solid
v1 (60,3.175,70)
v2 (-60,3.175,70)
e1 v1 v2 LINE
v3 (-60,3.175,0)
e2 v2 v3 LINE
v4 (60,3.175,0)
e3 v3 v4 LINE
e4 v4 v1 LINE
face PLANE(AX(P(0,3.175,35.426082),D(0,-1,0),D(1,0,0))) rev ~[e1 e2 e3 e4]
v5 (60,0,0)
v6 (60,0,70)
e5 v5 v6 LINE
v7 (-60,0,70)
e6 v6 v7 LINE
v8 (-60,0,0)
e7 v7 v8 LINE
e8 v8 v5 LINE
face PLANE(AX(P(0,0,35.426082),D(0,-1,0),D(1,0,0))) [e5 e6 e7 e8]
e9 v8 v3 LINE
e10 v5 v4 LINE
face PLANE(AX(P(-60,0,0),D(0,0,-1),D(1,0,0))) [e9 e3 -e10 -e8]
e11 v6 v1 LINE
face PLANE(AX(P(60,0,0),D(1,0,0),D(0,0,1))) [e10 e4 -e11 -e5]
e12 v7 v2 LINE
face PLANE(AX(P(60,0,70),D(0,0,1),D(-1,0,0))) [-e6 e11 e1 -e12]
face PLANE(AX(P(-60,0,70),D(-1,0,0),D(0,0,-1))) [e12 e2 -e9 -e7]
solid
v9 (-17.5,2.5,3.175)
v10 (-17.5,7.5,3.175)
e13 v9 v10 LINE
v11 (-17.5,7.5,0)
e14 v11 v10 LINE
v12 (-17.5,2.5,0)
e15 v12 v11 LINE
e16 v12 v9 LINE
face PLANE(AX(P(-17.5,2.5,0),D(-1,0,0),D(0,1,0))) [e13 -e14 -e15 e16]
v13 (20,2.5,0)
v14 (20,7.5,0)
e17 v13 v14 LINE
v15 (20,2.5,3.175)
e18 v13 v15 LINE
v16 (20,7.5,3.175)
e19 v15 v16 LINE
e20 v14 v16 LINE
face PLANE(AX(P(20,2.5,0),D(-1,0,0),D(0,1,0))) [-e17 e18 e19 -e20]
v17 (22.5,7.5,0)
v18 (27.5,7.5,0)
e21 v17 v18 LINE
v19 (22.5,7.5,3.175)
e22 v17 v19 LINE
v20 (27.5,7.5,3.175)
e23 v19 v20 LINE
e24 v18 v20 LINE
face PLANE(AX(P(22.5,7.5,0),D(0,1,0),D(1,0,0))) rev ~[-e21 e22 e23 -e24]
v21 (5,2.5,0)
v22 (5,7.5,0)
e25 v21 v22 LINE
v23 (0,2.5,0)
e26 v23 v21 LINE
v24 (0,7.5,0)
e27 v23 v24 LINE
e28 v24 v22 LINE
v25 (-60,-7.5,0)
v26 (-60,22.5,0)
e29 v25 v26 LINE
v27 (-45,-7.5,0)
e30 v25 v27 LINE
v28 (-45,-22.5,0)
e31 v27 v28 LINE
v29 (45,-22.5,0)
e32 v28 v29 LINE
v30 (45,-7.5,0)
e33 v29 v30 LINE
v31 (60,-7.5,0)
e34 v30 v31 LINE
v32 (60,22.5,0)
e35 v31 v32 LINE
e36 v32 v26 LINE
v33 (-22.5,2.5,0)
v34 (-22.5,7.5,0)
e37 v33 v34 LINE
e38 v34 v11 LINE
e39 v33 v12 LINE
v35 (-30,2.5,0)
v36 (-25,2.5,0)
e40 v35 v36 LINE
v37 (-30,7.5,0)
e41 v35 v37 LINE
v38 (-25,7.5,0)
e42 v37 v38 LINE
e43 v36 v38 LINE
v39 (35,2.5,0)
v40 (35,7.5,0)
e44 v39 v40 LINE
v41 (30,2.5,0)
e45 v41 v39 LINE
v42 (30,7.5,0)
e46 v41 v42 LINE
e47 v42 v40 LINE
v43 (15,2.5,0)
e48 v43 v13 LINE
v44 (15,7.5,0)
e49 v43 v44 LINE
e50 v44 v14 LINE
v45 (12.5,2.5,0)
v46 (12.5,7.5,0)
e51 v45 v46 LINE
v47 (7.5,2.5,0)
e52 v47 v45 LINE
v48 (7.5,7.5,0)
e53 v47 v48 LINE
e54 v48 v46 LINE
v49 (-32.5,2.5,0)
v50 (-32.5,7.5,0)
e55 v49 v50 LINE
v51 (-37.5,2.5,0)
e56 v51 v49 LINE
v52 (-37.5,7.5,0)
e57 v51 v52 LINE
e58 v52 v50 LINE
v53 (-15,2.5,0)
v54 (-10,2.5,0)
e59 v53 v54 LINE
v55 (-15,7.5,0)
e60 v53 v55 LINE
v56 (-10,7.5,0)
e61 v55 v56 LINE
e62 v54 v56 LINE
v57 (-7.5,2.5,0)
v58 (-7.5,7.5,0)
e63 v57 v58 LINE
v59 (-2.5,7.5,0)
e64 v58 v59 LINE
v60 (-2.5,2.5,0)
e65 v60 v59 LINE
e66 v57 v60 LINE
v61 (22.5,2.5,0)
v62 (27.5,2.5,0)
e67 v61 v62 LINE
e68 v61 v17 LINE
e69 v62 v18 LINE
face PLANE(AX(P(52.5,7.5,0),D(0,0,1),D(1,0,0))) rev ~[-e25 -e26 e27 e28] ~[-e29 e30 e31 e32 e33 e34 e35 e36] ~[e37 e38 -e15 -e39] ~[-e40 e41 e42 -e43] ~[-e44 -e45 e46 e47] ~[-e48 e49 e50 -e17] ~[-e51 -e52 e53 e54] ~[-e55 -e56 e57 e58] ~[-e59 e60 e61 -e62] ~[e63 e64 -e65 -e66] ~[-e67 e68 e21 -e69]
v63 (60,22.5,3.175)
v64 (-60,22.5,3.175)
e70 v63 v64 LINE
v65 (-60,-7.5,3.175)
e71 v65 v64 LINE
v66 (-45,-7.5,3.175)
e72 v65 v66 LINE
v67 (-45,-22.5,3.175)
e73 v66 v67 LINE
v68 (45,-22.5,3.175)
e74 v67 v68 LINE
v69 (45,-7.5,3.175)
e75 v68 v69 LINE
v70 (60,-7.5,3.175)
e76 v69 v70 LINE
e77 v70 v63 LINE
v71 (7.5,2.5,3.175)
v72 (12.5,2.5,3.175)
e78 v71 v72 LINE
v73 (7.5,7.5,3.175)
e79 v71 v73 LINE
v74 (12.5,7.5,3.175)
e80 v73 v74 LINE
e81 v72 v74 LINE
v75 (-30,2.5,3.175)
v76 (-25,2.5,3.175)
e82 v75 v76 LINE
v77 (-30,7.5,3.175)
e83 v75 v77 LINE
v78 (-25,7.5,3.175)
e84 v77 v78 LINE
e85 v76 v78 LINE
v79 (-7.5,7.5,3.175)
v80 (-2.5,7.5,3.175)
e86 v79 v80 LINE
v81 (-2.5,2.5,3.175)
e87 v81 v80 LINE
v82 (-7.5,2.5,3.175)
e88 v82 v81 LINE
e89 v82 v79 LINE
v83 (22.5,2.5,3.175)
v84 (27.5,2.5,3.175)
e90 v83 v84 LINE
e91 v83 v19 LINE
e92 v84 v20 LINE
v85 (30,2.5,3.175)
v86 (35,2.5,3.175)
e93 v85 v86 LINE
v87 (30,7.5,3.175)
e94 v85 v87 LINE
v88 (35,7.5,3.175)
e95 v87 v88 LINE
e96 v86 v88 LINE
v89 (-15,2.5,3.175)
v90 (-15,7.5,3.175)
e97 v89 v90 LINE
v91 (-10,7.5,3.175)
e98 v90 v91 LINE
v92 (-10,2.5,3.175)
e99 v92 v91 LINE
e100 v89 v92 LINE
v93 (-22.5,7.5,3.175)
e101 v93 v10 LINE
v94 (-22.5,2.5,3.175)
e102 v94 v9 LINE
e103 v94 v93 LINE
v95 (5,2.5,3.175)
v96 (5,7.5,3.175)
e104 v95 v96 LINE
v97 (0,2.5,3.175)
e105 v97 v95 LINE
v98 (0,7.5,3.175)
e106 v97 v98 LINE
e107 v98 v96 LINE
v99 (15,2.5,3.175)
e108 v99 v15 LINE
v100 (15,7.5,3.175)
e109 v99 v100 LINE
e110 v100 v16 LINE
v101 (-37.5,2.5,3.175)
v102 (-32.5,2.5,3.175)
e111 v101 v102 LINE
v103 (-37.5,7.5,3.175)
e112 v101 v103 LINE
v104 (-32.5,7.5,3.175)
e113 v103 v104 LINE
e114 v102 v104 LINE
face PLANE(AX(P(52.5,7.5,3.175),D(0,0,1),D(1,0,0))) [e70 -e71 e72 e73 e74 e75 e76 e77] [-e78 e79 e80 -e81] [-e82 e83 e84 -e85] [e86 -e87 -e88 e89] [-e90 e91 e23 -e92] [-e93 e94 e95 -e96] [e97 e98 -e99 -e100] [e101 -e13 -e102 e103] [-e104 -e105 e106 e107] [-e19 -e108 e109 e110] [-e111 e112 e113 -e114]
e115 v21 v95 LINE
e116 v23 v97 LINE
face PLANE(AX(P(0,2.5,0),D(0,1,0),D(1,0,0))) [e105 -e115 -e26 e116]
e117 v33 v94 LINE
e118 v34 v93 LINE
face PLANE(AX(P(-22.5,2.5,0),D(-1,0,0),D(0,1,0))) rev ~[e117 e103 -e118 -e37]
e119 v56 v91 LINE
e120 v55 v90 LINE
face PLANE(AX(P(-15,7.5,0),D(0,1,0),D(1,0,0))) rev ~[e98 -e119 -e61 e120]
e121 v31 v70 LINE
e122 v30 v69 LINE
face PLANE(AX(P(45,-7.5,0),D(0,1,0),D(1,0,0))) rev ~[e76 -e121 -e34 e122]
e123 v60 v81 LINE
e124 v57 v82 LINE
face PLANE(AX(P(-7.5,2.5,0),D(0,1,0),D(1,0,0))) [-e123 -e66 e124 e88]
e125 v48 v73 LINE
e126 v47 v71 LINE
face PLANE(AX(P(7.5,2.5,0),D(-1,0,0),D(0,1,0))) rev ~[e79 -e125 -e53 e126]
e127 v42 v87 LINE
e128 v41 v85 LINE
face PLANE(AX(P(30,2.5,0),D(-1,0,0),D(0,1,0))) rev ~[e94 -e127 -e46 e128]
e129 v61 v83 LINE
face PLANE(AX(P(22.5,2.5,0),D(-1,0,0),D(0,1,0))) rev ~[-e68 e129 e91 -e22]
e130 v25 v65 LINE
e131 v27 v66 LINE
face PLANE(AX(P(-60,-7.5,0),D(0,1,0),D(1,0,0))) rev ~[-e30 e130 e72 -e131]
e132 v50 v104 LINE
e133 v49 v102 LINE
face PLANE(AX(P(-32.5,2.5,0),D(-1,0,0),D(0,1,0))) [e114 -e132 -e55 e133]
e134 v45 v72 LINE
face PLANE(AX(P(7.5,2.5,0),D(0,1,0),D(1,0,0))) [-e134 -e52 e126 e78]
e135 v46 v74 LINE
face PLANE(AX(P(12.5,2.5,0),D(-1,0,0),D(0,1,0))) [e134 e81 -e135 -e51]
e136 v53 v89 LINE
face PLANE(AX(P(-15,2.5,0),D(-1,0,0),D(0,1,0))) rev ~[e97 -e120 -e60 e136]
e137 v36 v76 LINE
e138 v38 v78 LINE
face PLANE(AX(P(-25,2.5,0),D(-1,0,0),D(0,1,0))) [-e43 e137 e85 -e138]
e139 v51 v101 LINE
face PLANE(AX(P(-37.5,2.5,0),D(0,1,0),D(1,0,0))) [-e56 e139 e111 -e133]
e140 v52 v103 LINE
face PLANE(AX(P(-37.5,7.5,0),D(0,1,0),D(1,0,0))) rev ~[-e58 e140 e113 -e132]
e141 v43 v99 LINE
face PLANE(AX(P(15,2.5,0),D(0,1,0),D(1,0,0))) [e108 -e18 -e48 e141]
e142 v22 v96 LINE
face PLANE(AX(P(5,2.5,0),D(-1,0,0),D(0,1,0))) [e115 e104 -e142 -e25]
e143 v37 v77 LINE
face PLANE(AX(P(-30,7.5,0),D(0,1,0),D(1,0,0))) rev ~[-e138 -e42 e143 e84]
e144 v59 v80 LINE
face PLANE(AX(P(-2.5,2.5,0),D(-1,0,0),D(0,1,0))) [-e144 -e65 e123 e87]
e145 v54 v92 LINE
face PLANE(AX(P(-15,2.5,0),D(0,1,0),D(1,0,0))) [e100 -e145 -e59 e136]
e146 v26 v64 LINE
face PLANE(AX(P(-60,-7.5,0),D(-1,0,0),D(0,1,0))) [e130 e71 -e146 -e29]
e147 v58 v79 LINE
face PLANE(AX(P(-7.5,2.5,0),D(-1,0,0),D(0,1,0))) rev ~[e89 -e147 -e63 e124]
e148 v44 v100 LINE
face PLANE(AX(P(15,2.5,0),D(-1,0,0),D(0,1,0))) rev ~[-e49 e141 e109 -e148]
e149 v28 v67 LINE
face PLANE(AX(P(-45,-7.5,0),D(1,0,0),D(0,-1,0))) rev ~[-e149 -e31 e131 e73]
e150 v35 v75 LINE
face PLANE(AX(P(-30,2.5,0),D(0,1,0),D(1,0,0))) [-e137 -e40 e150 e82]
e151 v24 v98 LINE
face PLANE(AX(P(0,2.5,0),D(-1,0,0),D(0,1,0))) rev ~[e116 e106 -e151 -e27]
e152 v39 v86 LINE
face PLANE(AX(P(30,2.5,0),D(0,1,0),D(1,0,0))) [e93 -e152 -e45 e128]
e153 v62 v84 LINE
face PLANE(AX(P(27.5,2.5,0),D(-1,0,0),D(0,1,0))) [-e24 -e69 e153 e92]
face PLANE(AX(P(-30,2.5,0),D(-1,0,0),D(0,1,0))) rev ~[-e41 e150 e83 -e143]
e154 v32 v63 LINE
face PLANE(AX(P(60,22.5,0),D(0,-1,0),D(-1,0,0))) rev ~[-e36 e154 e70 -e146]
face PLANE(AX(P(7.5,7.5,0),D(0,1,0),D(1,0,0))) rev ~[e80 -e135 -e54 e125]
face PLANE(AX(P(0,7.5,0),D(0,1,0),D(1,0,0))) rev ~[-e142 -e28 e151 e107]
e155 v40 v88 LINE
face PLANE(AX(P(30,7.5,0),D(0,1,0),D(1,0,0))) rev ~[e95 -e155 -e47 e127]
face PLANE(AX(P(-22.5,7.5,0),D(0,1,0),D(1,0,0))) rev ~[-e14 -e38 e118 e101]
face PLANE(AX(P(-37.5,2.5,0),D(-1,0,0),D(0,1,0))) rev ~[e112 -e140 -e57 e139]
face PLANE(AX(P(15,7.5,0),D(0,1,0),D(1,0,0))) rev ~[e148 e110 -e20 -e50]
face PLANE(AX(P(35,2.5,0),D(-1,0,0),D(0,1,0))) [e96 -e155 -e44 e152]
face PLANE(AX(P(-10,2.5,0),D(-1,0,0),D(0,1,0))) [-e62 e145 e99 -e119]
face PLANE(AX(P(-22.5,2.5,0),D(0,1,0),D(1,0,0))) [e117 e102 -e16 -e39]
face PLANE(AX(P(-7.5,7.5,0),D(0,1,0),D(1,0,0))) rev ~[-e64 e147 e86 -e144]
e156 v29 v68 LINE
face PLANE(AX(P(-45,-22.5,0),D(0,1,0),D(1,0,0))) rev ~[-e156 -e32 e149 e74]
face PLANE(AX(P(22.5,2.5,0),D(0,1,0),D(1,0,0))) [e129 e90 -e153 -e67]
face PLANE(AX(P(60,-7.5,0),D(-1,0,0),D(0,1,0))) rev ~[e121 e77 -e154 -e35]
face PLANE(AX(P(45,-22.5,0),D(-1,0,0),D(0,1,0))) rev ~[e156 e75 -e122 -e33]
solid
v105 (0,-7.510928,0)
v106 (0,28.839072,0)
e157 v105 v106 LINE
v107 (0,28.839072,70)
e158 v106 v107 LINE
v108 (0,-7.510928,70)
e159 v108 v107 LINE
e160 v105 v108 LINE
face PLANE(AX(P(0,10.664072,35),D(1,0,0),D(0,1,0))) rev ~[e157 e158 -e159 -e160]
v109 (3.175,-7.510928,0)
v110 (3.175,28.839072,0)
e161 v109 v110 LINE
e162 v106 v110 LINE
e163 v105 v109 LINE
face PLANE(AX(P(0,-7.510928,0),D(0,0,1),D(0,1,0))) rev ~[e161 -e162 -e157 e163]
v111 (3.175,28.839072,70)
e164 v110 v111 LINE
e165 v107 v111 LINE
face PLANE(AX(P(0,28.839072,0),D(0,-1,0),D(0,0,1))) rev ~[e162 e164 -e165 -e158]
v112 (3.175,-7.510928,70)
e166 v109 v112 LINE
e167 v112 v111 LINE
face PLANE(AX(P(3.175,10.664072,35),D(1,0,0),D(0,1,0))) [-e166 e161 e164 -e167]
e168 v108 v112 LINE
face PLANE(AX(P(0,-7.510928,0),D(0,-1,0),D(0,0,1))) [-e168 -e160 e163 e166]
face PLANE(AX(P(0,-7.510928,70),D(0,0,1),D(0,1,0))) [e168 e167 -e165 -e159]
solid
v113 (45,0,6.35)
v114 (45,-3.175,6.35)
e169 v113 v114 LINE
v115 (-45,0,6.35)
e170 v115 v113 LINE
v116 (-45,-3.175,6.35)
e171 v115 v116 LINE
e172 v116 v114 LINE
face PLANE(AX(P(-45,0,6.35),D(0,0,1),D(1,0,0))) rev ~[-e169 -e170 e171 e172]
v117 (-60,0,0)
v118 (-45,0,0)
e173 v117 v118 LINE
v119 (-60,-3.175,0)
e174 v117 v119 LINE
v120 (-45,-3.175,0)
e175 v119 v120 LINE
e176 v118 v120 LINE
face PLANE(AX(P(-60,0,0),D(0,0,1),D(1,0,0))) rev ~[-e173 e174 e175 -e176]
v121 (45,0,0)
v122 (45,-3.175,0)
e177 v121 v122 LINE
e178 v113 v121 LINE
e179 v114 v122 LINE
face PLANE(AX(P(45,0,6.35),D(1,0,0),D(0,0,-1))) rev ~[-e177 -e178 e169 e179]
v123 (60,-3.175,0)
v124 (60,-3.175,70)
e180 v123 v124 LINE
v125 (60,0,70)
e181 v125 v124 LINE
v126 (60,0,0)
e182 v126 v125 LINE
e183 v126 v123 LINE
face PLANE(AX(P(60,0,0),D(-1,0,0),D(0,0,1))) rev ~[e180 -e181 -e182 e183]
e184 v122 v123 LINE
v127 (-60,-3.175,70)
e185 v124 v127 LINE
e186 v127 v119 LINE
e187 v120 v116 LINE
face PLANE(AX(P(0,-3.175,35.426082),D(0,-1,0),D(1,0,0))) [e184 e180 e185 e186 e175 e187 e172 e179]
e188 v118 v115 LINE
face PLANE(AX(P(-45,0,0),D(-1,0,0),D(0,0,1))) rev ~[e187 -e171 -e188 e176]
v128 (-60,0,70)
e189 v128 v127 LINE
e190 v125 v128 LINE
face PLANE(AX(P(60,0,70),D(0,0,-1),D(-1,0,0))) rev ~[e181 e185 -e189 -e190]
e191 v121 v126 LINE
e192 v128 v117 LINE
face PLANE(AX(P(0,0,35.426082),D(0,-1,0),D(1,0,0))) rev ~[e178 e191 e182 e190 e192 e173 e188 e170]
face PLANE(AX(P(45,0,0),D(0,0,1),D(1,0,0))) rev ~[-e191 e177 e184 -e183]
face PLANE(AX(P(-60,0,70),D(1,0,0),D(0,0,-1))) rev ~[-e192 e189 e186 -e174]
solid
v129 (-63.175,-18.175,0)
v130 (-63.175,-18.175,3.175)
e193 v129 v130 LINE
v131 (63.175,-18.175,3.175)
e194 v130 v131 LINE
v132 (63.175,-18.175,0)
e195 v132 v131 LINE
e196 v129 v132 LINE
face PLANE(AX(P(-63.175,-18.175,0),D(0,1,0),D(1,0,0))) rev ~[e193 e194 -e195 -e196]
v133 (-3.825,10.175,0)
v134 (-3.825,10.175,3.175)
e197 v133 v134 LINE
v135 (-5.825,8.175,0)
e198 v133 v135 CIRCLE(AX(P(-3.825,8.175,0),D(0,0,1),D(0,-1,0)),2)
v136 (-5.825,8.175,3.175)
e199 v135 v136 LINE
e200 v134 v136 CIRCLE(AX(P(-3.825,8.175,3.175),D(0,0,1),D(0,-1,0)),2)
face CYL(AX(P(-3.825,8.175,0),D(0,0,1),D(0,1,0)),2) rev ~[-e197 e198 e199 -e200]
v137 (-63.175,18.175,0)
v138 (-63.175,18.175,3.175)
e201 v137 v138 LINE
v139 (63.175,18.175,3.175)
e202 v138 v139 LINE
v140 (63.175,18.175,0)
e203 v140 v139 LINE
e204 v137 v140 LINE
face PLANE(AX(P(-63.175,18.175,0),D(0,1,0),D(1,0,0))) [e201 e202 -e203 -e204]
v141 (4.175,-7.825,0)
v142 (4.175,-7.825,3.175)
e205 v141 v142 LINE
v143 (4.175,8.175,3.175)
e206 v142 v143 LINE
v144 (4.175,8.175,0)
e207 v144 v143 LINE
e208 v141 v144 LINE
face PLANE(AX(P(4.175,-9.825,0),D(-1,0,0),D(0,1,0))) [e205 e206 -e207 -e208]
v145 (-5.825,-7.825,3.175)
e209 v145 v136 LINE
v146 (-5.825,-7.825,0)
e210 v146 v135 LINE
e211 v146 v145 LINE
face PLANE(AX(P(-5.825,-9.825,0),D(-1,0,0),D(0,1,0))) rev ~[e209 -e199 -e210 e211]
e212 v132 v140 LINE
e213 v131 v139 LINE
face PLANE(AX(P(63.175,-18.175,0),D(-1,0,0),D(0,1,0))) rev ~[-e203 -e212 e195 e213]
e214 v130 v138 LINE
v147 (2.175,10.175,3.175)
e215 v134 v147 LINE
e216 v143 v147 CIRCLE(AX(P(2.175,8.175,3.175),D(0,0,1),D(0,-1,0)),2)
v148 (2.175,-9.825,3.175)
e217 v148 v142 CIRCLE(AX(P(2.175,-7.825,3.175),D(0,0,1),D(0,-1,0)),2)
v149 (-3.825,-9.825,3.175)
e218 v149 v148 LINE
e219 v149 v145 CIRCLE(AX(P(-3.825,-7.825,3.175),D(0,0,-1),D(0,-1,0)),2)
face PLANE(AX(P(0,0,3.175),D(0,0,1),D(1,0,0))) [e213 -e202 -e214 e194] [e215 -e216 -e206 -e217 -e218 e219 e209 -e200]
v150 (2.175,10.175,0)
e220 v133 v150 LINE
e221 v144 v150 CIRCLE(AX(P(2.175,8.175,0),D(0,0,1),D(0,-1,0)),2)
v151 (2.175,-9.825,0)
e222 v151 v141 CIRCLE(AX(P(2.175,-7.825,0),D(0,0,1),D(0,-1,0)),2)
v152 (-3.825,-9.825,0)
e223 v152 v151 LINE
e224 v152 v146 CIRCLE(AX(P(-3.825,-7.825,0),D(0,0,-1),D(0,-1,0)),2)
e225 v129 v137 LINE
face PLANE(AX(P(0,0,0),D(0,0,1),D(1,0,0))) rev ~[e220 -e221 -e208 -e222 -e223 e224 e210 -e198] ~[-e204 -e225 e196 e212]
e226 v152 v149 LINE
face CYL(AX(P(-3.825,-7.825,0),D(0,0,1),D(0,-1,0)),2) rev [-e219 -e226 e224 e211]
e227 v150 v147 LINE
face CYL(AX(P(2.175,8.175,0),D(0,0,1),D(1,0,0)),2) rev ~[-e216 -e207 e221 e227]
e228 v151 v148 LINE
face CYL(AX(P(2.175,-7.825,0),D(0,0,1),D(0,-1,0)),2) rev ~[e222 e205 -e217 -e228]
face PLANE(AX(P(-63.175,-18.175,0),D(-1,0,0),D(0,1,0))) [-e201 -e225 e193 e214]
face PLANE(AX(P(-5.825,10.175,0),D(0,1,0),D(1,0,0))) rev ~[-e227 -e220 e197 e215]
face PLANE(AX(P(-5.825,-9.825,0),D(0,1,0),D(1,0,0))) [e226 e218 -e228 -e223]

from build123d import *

# Parameters (mm, degrees)
F0_W     = 15
F0_H     = 30
F0_W_2   = 5
F0_H_2   = 5
F1_DEPTH = 3.175
F3_DEPTH = 3.175
F2_W     = 90
F2_H     = 6.35
F4_DEPTH = 3.175
F5_W     = 36.35
F5_H     = 70
F6_DEPTH = 3.175
F7_W     = 126.35
F7_H     = 36.35
F7_W_2   = 10
F7_H_2   = 20
F8_DEPTH = 3.175
F9_R     = 2


# Not quite as in the source:
# - a feature names something its author has since deleted; it is built from what else it names


with BuildPart() as f1:
    # F0 (on Top) → F1 (new body)
    with BuildSketch(Plane.XY):
        with Locations((52.5, 7.5)):
            Rectangle(F0_W, F0_H)
        with Locations((-52.5, 7.5)):
            Rectangle(F0_W, F0_H)
        Polygon((-45, -22.5), (45, -22.5), (45, -7.5), (45, 22.5), (-45, 22.5), (-45, -7.5), (-45, -10.675), align=None)
        with Locations((-35, 5)):
            Rectangle(F0_W_2, F0_H_2, mode=Mode.SUBTRACT)
        with Locations((-27.5, 5)):
            Rectangle(F0_W_2, F0_H_2, mode=Mode.SUBTRACT)
        with Locations((-20, 5)):
            Rectangle(F0_W_2, F0_H_2, mode=Mode.SUBTRACT)
        with Locations((-12.5, 5)):
            Rectangle(F0_W_2, F0_H_2, mode=Mode.SUBTRACT)
        with Locations((-5, 5)):
            Rectangle(F0_W_2, F0_H_2, mode=Mode.SUBTRACT)
        with Locations((2.5, 5)):
            Rectangle(F0_W_2, F0_H_2, mode=Mode.SUBTRACT)
        with Locations((10, 5)):
            Rectangle(F0_W_2, F0_H_2, mode=Mode.SUBTRACT)
        with Locations((17.5, 5)):
            Rectangle(F0_W_2, F0_H_2, mode=Mode.SUBTRACT)
        with Locations((25, 5)):
            Rectangle(F0_W_2, F0_H_2, mode=Mode.SUBTRACT)
        with Locations((32.5, 5)):
            Rectangle(F0_W_2, F0_H_2, mode=Mode.SUBTRACT)
    extrude(amount=F1_DEPTH)


with BuildPart() as f3:
    # F2 (on Front) → F3 (new body)
    with BuildSketch(Plane.XZ):
        Polygon((-60, 70), (-60, 0), (-45, 0), (-45, 6.35), (45, 6.35), (45, 0), (60, 0), (60, 70), align=None)
    extrude(amount=F3_DEPTH)


with BuildPart() as f4:
    # F2 (on Front) → F4 (new body)
    with BuildSketch(Plane.XZ):
        Polygon((-60, 70), (-60, 0), (-45, 0), (-45, 6.35), (45, 6.35), (45, 0), (60, 0), (60, 70), align=None)
        with Locations((0, 3.175)):
            Rectangle(F2_W, F2_H)
    extrude(amount=-F4_DEPTH)


with BuildPart() as f6:
    # F5 (on Right) → F6 (new body)
    with BuildSketch(Plane.YZ):
        with Locations((10.6640724358, 35)):
            Rectangle(F5_W, F5_H)
    extrude(amount=F6_DEPTH)


with BuildPart() as f8:
    # F7 (on Top) → F8 (new body)
    with BuildSketch(Plane.XY):
        Rectangle(F7_W, F7_H)
        with Locations((-0.825, 0.175)):
            Rectangle(F7_W_2, F7_H_2, mode=Mode.SUBTRACT)
    extrude(amount=F8_DEPTH)

    # F9
    f9_edges = [f8.edges().sort_by_distance(p)[0] for p in [
        (-5.825, 10.175, 1.5875),
        (4.175, 10.175, 1.5875),
        (4.175, -9.825, 1.5875),
        (-5.825, -9.825, 1.5875),
    ]]
    fillet(f9_edges, radius=F9_R)


solid = Compound([f1.part, f3.part, f4.part, f6.part, f8.part])
